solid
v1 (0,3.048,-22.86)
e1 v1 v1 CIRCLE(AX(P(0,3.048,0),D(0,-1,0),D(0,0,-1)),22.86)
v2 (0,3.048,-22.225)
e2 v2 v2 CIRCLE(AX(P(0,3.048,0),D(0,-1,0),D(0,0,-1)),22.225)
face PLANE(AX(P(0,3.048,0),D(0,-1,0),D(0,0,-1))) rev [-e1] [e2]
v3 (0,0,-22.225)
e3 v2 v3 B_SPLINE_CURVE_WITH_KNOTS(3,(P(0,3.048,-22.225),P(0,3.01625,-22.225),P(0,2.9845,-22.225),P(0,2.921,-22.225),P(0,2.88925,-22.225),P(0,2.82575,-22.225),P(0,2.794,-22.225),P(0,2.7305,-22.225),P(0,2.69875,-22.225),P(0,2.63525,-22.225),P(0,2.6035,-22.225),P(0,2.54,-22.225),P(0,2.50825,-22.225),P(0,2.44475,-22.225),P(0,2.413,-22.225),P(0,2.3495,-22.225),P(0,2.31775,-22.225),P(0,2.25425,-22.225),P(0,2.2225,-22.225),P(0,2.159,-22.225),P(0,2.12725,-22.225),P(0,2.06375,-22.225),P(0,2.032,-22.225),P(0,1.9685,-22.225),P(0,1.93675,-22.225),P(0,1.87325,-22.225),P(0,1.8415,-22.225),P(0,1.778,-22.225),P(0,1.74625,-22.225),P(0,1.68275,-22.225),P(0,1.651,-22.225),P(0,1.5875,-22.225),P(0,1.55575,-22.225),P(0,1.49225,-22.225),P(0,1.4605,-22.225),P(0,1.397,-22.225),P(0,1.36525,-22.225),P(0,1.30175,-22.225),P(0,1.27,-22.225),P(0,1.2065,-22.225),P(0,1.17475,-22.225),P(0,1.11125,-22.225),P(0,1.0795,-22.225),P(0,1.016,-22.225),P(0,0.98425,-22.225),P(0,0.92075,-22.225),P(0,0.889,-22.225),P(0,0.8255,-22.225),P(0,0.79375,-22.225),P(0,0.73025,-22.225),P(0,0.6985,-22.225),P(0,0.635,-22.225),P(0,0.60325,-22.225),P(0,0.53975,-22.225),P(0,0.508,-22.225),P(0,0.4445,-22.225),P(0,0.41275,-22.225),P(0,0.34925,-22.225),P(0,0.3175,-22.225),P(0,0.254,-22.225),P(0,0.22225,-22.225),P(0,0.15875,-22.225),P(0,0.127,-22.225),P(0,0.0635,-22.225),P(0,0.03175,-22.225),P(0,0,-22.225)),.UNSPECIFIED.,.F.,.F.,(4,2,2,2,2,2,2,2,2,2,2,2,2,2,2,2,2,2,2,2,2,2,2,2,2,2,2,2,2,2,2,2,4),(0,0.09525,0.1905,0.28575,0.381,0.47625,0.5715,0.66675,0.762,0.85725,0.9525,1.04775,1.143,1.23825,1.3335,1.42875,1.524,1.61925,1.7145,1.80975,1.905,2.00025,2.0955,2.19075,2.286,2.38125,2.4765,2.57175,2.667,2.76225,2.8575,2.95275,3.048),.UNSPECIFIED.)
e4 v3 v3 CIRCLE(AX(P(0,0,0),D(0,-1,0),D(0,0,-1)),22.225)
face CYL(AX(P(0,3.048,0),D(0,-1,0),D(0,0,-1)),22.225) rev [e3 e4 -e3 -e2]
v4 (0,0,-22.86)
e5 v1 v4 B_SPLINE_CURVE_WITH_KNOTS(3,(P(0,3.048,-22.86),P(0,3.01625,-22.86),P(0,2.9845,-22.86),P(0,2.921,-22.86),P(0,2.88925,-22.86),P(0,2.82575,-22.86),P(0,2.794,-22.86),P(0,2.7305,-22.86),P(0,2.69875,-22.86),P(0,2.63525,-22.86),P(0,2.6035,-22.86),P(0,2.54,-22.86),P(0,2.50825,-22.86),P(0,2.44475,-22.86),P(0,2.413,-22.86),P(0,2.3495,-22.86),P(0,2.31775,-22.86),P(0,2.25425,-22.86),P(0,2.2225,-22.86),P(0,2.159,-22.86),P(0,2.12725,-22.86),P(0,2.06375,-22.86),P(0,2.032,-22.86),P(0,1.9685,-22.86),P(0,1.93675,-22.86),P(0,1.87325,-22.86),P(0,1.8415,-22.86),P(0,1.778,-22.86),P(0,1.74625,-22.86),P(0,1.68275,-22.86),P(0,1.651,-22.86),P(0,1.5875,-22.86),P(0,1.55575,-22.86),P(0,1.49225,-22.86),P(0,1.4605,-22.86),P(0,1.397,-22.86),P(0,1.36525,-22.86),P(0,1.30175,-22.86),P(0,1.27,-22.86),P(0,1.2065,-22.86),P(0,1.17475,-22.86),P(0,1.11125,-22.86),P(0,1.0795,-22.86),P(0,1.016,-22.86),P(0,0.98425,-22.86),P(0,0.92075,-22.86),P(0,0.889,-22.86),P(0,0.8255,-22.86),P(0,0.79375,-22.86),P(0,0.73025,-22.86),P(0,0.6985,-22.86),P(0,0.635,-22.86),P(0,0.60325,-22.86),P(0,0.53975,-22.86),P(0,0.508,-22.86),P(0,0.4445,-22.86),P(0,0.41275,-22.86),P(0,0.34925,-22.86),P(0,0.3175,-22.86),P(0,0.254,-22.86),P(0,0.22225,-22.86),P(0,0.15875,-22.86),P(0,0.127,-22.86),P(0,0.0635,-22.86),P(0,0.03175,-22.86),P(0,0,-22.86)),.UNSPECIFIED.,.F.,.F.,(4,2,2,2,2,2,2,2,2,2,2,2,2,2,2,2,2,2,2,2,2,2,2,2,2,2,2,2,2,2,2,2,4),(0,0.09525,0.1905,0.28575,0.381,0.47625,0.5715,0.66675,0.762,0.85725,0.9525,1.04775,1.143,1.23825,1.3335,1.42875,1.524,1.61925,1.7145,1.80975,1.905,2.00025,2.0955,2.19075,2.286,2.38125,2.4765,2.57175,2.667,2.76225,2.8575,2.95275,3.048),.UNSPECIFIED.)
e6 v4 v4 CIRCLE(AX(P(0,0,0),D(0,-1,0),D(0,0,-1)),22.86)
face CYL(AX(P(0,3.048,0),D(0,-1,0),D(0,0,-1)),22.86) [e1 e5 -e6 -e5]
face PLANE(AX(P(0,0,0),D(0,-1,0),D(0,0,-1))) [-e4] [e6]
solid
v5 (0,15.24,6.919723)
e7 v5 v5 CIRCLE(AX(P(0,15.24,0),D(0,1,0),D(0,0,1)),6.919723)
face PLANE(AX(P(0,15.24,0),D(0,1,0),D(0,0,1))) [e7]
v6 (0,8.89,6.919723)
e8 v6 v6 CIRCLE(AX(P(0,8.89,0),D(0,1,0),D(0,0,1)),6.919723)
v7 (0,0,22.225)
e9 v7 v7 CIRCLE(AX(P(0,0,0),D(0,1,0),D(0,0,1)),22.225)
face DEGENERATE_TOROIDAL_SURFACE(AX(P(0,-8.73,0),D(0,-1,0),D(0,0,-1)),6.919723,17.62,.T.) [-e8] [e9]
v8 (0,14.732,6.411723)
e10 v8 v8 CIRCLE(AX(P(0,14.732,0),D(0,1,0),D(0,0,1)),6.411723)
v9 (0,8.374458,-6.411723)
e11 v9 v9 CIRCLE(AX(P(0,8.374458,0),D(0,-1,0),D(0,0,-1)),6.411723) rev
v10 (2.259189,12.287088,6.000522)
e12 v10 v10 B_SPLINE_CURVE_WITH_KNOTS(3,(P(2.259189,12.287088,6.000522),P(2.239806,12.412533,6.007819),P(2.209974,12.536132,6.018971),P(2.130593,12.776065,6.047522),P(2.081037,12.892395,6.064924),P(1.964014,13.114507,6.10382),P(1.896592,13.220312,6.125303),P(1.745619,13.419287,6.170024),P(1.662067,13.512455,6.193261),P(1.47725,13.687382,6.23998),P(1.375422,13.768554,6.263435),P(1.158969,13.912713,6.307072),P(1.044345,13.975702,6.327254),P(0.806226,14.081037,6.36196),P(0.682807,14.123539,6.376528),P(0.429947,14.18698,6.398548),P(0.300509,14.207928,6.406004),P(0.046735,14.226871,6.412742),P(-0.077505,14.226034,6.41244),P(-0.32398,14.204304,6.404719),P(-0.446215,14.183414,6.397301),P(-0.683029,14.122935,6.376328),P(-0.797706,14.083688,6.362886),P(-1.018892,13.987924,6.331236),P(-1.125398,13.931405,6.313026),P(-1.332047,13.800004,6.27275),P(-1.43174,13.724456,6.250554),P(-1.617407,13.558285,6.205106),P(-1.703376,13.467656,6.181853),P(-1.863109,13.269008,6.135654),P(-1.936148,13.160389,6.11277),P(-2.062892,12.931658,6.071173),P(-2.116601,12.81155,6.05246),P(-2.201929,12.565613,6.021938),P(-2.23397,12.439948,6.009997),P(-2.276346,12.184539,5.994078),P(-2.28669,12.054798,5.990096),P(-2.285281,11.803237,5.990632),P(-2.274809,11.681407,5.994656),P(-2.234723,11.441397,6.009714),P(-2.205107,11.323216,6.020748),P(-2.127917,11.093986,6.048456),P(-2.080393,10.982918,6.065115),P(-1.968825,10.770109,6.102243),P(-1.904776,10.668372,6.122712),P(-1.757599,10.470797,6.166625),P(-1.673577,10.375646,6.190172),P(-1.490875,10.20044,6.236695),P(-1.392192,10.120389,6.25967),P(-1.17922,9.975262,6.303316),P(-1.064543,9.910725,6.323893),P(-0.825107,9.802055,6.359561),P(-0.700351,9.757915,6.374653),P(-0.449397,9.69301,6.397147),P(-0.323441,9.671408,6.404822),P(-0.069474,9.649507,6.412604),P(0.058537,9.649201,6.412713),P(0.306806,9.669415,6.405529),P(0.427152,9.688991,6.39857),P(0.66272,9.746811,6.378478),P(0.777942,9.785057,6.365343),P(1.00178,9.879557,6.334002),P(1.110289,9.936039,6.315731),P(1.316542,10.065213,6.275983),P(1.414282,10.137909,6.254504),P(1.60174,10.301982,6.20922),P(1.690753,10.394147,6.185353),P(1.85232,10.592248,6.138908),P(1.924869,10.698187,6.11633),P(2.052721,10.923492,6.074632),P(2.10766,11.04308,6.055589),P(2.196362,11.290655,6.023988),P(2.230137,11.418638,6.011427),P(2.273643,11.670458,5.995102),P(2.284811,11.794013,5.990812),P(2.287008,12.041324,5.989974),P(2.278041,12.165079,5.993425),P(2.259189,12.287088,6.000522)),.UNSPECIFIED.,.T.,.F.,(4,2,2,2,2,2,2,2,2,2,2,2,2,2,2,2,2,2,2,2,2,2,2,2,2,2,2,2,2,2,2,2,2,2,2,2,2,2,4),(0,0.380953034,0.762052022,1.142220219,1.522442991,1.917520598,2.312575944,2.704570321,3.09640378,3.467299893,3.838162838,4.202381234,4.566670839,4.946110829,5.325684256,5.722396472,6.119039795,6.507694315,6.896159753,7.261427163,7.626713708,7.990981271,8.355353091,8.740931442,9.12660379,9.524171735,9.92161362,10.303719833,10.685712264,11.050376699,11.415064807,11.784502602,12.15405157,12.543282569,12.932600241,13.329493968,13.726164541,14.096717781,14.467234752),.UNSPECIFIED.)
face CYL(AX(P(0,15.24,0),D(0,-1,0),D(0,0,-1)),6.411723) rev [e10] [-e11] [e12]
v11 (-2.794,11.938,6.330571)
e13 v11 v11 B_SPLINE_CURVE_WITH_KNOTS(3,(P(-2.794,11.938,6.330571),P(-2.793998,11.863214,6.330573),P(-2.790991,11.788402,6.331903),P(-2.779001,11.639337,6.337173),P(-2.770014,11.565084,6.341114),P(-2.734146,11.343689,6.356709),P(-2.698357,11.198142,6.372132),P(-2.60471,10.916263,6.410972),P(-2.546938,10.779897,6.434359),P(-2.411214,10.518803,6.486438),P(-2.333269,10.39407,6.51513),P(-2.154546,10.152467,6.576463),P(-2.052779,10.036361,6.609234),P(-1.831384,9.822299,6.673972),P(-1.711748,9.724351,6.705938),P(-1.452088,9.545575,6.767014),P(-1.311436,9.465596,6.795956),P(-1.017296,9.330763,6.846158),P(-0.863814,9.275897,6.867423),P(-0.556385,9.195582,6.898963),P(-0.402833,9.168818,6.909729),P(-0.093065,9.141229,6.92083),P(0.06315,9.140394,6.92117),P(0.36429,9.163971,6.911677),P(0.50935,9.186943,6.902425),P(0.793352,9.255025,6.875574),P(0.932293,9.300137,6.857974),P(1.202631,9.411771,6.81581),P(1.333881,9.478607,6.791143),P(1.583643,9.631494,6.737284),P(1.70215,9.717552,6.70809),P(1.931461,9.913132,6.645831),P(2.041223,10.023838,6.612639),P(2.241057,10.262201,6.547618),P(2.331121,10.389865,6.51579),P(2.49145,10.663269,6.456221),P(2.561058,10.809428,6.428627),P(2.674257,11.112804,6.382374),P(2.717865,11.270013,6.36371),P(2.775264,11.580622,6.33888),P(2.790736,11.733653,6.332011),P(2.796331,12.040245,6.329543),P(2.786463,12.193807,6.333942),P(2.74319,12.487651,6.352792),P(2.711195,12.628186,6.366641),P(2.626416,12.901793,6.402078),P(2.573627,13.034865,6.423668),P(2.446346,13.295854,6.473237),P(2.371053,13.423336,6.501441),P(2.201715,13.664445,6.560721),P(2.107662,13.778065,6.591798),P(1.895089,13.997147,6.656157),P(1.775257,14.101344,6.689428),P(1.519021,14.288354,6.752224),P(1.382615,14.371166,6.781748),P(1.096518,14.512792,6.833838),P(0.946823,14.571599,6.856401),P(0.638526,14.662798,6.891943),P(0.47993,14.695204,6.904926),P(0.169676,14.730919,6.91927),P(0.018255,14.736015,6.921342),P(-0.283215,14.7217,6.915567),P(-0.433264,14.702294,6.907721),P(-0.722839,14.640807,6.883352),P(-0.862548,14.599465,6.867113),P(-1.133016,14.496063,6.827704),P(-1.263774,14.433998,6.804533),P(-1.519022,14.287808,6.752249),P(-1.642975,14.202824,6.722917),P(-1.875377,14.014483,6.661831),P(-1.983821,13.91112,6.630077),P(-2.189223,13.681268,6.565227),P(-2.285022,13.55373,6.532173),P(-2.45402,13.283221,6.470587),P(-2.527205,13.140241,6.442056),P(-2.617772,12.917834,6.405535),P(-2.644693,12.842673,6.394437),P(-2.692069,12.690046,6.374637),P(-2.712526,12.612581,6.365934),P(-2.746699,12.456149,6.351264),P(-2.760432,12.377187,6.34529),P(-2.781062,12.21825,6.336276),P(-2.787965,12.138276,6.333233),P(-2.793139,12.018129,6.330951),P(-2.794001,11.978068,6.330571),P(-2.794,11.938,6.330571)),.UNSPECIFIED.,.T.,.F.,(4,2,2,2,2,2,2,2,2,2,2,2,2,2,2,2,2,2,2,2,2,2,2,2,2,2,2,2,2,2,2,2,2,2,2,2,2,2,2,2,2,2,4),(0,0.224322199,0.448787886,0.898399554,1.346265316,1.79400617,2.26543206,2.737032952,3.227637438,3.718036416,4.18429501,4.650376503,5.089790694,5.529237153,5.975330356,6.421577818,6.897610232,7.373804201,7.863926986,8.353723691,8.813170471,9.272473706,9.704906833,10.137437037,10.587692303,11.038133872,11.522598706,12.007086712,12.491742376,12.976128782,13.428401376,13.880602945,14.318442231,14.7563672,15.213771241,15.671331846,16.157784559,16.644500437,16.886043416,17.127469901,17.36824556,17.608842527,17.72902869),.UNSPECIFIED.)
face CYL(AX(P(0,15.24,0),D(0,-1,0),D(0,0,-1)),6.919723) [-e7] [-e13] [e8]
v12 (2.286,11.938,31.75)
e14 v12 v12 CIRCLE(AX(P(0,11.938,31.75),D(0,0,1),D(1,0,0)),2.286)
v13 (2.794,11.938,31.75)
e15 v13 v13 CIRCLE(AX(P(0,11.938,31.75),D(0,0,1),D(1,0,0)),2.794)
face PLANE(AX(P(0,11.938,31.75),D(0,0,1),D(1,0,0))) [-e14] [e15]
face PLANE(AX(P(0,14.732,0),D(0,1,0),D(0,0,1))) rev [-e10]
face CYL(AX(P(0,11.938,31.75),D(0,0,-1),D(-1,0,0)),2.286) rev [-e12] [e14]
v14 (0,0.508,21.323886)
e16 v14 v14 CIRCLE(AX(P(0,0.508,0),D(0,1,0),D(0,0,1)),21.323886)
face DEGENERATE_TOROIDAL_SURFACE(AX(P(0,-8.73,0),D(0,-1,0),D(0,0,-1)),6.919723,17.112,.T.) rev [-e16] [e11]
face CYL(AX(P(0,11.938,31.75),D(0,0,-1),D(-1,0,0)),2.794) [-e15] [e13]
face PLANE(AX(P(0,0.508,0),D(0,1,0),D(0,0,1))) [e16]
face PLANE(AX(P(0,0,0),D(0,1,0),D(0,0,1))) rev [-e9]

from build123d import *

# Parameters (mm, degrees)
SKETCH1_R           = 22.225
BOSS_EXTRUDE2_DEPTH = 8.89
FILLET1_R           = 17.62
SKETCH4_R           = 22.86
SKETCH4_R_2         = 22.225
BOSS_EXTRUDE4_DEPTH = 3.048
SKETCH6_R           = 6.919723132
BOSS_EXTRUDE5_DEPTH = 6.35
SKETCH7_R           = 2.794
BOSS_EXTRUDE6_DEPTH = 31.75
SHELL1_START        = 0.508
SHELL1_OUTLINE_R    = 6.411723132
SHELL1_DEPTH        = 14.224
SHELL1_START_2      = 5.990358975
SHELL1_2_OUTLINE_R  = 2.286
SHELL1_2_DEPTH      = 25.759641025


with BuildPart() as part:
    # Sketch1 → Boss-Extrude2 (new body)
    with BuildSketch(Plane(origin=(0, 0, 0), x_dir=(1, 0, 0), z_dir=(0, 1, 0))):
        with Locations(Location((0, 0, 0), (0, 0, 270))):
            Circle(SKETCH1_R)
    extrude(amount=BOSS_EXTRUDE2_DEPTH)

    # Fillet1
    # the kernel refuses this fillet: 17.62 mm, written as the material it takes off along each edge
    with BuildSketch(Plane(origin=(0, 8.89, 0), x_dir=(0, 0, 1), z_dir=(-1, 0, 0))) as fillet1_piece_1:
        with BuildLine():
            CenterArc((6.919723132, -17.62), FILLET1_R, 29.700068365, 60.299931635)
            Line((6.919723132, 0), (6.919723132, 0.3524))
            Line((6.919723132, 0.3524), (22.225, 0.3524))
            Line((22.225, 0.3524), (22.5774, 0))
            ThreePointArc((22.5774, 0), (22.5774, -4.445), (22.531105537, -8.7154))
            Line((22.531105537, -8.7154), (22.225, -8.89))
        make_face()
    revolve(axis=Axis((0, 8.89, 0), (0, 1, 0)), mode=Mode.SUBTRACT)

    # Sketch6 → Boss-Extrude5 (add)
    with BuildSketch(Plane(origin=(0, 8.89, 0), x_dir=(1, 0, 0), z_dir=(0, 1, 0))):
        with Locations(Location((0, 0, 0), (0, 0, 270))):
            Circle(SKETCH6_R)
    extrude(amount=BOSS_EXTRUDE5_DEPTH)

    # Sketch7 → Boss-Extrude6 (add)
    with BuildSketch(Plane.XY):
        with Locations(Location((0, 11.938, 0), (0, 0, 180))):
            Circle(SKETCH7_R)
    extrude(amount=BOSS_EXTRUDE6_DEPTH)

    # Shell1: read off the stored shape, not the designer's step
    # Shell1 outline → Shell1 (cut)
    with BuildSketch(Plane(origin=(0, 0, 0), x_dir=(1, 0, 0), z_dir=(0, 1, 0)).offset(SHELL1_START)):
        Circle(SHELL1_OUTLINE_R)
    extrude(amount=SHELL1_DEPTH, mode=Mode.SUBTRACT)

    # Shell1 2 outline → Shell1 2 (cut)
    with BuildSketch(Plane.XY.offset(SHELL1_START_2)):
        with Locations((0, 11.938)):
            Circle(SHELL1_2_OUTLINE_R)
    extrude(amount=SHELL1_2_DEPTH, mode=Mode.SUBTRACT)

    # Shell1 3 outline → Shell1 3 (revolve, cut)
    with BuildSketch(Plane.XY):
        with BuildLine():
            Line((6.411723132, 8.374457898), (6.411723132, 0.508))
            Line((6.411723132, 0.508), (21.323885725, 0.508))
            ThreePointArc((21.323885725, 0.508), (14.903840095, 6.405204668), (6.411723132, 8.374457898))
        make_face()
    revolve(axis=Axis((0, 0, 0), (0, 1, 0)), mode=Mode.SUBTRACT)


with BuildPart() as body_2:
    # Sketch4 → Boss-Extrude4 (new body)
    with BuildSketch(Plane(origin=(0, 0, 0), x_dir=(-1, 0, 0), z_dir=(0, -1, 0))):
        with Locations(Location((0, 0, 0), (0, 0, 90))):
            Circle(SKETCH4_R)
        with Locations(Location((0, 0, 0), (0, 0, 90))):
            Circle(SKETCH4_R_2, mode=Mode.SUBTRACT)
    extrude(amount=-BOSS_EXTRUDE4_DEPTH)


solid = Compound([part.part, body_2.part])
